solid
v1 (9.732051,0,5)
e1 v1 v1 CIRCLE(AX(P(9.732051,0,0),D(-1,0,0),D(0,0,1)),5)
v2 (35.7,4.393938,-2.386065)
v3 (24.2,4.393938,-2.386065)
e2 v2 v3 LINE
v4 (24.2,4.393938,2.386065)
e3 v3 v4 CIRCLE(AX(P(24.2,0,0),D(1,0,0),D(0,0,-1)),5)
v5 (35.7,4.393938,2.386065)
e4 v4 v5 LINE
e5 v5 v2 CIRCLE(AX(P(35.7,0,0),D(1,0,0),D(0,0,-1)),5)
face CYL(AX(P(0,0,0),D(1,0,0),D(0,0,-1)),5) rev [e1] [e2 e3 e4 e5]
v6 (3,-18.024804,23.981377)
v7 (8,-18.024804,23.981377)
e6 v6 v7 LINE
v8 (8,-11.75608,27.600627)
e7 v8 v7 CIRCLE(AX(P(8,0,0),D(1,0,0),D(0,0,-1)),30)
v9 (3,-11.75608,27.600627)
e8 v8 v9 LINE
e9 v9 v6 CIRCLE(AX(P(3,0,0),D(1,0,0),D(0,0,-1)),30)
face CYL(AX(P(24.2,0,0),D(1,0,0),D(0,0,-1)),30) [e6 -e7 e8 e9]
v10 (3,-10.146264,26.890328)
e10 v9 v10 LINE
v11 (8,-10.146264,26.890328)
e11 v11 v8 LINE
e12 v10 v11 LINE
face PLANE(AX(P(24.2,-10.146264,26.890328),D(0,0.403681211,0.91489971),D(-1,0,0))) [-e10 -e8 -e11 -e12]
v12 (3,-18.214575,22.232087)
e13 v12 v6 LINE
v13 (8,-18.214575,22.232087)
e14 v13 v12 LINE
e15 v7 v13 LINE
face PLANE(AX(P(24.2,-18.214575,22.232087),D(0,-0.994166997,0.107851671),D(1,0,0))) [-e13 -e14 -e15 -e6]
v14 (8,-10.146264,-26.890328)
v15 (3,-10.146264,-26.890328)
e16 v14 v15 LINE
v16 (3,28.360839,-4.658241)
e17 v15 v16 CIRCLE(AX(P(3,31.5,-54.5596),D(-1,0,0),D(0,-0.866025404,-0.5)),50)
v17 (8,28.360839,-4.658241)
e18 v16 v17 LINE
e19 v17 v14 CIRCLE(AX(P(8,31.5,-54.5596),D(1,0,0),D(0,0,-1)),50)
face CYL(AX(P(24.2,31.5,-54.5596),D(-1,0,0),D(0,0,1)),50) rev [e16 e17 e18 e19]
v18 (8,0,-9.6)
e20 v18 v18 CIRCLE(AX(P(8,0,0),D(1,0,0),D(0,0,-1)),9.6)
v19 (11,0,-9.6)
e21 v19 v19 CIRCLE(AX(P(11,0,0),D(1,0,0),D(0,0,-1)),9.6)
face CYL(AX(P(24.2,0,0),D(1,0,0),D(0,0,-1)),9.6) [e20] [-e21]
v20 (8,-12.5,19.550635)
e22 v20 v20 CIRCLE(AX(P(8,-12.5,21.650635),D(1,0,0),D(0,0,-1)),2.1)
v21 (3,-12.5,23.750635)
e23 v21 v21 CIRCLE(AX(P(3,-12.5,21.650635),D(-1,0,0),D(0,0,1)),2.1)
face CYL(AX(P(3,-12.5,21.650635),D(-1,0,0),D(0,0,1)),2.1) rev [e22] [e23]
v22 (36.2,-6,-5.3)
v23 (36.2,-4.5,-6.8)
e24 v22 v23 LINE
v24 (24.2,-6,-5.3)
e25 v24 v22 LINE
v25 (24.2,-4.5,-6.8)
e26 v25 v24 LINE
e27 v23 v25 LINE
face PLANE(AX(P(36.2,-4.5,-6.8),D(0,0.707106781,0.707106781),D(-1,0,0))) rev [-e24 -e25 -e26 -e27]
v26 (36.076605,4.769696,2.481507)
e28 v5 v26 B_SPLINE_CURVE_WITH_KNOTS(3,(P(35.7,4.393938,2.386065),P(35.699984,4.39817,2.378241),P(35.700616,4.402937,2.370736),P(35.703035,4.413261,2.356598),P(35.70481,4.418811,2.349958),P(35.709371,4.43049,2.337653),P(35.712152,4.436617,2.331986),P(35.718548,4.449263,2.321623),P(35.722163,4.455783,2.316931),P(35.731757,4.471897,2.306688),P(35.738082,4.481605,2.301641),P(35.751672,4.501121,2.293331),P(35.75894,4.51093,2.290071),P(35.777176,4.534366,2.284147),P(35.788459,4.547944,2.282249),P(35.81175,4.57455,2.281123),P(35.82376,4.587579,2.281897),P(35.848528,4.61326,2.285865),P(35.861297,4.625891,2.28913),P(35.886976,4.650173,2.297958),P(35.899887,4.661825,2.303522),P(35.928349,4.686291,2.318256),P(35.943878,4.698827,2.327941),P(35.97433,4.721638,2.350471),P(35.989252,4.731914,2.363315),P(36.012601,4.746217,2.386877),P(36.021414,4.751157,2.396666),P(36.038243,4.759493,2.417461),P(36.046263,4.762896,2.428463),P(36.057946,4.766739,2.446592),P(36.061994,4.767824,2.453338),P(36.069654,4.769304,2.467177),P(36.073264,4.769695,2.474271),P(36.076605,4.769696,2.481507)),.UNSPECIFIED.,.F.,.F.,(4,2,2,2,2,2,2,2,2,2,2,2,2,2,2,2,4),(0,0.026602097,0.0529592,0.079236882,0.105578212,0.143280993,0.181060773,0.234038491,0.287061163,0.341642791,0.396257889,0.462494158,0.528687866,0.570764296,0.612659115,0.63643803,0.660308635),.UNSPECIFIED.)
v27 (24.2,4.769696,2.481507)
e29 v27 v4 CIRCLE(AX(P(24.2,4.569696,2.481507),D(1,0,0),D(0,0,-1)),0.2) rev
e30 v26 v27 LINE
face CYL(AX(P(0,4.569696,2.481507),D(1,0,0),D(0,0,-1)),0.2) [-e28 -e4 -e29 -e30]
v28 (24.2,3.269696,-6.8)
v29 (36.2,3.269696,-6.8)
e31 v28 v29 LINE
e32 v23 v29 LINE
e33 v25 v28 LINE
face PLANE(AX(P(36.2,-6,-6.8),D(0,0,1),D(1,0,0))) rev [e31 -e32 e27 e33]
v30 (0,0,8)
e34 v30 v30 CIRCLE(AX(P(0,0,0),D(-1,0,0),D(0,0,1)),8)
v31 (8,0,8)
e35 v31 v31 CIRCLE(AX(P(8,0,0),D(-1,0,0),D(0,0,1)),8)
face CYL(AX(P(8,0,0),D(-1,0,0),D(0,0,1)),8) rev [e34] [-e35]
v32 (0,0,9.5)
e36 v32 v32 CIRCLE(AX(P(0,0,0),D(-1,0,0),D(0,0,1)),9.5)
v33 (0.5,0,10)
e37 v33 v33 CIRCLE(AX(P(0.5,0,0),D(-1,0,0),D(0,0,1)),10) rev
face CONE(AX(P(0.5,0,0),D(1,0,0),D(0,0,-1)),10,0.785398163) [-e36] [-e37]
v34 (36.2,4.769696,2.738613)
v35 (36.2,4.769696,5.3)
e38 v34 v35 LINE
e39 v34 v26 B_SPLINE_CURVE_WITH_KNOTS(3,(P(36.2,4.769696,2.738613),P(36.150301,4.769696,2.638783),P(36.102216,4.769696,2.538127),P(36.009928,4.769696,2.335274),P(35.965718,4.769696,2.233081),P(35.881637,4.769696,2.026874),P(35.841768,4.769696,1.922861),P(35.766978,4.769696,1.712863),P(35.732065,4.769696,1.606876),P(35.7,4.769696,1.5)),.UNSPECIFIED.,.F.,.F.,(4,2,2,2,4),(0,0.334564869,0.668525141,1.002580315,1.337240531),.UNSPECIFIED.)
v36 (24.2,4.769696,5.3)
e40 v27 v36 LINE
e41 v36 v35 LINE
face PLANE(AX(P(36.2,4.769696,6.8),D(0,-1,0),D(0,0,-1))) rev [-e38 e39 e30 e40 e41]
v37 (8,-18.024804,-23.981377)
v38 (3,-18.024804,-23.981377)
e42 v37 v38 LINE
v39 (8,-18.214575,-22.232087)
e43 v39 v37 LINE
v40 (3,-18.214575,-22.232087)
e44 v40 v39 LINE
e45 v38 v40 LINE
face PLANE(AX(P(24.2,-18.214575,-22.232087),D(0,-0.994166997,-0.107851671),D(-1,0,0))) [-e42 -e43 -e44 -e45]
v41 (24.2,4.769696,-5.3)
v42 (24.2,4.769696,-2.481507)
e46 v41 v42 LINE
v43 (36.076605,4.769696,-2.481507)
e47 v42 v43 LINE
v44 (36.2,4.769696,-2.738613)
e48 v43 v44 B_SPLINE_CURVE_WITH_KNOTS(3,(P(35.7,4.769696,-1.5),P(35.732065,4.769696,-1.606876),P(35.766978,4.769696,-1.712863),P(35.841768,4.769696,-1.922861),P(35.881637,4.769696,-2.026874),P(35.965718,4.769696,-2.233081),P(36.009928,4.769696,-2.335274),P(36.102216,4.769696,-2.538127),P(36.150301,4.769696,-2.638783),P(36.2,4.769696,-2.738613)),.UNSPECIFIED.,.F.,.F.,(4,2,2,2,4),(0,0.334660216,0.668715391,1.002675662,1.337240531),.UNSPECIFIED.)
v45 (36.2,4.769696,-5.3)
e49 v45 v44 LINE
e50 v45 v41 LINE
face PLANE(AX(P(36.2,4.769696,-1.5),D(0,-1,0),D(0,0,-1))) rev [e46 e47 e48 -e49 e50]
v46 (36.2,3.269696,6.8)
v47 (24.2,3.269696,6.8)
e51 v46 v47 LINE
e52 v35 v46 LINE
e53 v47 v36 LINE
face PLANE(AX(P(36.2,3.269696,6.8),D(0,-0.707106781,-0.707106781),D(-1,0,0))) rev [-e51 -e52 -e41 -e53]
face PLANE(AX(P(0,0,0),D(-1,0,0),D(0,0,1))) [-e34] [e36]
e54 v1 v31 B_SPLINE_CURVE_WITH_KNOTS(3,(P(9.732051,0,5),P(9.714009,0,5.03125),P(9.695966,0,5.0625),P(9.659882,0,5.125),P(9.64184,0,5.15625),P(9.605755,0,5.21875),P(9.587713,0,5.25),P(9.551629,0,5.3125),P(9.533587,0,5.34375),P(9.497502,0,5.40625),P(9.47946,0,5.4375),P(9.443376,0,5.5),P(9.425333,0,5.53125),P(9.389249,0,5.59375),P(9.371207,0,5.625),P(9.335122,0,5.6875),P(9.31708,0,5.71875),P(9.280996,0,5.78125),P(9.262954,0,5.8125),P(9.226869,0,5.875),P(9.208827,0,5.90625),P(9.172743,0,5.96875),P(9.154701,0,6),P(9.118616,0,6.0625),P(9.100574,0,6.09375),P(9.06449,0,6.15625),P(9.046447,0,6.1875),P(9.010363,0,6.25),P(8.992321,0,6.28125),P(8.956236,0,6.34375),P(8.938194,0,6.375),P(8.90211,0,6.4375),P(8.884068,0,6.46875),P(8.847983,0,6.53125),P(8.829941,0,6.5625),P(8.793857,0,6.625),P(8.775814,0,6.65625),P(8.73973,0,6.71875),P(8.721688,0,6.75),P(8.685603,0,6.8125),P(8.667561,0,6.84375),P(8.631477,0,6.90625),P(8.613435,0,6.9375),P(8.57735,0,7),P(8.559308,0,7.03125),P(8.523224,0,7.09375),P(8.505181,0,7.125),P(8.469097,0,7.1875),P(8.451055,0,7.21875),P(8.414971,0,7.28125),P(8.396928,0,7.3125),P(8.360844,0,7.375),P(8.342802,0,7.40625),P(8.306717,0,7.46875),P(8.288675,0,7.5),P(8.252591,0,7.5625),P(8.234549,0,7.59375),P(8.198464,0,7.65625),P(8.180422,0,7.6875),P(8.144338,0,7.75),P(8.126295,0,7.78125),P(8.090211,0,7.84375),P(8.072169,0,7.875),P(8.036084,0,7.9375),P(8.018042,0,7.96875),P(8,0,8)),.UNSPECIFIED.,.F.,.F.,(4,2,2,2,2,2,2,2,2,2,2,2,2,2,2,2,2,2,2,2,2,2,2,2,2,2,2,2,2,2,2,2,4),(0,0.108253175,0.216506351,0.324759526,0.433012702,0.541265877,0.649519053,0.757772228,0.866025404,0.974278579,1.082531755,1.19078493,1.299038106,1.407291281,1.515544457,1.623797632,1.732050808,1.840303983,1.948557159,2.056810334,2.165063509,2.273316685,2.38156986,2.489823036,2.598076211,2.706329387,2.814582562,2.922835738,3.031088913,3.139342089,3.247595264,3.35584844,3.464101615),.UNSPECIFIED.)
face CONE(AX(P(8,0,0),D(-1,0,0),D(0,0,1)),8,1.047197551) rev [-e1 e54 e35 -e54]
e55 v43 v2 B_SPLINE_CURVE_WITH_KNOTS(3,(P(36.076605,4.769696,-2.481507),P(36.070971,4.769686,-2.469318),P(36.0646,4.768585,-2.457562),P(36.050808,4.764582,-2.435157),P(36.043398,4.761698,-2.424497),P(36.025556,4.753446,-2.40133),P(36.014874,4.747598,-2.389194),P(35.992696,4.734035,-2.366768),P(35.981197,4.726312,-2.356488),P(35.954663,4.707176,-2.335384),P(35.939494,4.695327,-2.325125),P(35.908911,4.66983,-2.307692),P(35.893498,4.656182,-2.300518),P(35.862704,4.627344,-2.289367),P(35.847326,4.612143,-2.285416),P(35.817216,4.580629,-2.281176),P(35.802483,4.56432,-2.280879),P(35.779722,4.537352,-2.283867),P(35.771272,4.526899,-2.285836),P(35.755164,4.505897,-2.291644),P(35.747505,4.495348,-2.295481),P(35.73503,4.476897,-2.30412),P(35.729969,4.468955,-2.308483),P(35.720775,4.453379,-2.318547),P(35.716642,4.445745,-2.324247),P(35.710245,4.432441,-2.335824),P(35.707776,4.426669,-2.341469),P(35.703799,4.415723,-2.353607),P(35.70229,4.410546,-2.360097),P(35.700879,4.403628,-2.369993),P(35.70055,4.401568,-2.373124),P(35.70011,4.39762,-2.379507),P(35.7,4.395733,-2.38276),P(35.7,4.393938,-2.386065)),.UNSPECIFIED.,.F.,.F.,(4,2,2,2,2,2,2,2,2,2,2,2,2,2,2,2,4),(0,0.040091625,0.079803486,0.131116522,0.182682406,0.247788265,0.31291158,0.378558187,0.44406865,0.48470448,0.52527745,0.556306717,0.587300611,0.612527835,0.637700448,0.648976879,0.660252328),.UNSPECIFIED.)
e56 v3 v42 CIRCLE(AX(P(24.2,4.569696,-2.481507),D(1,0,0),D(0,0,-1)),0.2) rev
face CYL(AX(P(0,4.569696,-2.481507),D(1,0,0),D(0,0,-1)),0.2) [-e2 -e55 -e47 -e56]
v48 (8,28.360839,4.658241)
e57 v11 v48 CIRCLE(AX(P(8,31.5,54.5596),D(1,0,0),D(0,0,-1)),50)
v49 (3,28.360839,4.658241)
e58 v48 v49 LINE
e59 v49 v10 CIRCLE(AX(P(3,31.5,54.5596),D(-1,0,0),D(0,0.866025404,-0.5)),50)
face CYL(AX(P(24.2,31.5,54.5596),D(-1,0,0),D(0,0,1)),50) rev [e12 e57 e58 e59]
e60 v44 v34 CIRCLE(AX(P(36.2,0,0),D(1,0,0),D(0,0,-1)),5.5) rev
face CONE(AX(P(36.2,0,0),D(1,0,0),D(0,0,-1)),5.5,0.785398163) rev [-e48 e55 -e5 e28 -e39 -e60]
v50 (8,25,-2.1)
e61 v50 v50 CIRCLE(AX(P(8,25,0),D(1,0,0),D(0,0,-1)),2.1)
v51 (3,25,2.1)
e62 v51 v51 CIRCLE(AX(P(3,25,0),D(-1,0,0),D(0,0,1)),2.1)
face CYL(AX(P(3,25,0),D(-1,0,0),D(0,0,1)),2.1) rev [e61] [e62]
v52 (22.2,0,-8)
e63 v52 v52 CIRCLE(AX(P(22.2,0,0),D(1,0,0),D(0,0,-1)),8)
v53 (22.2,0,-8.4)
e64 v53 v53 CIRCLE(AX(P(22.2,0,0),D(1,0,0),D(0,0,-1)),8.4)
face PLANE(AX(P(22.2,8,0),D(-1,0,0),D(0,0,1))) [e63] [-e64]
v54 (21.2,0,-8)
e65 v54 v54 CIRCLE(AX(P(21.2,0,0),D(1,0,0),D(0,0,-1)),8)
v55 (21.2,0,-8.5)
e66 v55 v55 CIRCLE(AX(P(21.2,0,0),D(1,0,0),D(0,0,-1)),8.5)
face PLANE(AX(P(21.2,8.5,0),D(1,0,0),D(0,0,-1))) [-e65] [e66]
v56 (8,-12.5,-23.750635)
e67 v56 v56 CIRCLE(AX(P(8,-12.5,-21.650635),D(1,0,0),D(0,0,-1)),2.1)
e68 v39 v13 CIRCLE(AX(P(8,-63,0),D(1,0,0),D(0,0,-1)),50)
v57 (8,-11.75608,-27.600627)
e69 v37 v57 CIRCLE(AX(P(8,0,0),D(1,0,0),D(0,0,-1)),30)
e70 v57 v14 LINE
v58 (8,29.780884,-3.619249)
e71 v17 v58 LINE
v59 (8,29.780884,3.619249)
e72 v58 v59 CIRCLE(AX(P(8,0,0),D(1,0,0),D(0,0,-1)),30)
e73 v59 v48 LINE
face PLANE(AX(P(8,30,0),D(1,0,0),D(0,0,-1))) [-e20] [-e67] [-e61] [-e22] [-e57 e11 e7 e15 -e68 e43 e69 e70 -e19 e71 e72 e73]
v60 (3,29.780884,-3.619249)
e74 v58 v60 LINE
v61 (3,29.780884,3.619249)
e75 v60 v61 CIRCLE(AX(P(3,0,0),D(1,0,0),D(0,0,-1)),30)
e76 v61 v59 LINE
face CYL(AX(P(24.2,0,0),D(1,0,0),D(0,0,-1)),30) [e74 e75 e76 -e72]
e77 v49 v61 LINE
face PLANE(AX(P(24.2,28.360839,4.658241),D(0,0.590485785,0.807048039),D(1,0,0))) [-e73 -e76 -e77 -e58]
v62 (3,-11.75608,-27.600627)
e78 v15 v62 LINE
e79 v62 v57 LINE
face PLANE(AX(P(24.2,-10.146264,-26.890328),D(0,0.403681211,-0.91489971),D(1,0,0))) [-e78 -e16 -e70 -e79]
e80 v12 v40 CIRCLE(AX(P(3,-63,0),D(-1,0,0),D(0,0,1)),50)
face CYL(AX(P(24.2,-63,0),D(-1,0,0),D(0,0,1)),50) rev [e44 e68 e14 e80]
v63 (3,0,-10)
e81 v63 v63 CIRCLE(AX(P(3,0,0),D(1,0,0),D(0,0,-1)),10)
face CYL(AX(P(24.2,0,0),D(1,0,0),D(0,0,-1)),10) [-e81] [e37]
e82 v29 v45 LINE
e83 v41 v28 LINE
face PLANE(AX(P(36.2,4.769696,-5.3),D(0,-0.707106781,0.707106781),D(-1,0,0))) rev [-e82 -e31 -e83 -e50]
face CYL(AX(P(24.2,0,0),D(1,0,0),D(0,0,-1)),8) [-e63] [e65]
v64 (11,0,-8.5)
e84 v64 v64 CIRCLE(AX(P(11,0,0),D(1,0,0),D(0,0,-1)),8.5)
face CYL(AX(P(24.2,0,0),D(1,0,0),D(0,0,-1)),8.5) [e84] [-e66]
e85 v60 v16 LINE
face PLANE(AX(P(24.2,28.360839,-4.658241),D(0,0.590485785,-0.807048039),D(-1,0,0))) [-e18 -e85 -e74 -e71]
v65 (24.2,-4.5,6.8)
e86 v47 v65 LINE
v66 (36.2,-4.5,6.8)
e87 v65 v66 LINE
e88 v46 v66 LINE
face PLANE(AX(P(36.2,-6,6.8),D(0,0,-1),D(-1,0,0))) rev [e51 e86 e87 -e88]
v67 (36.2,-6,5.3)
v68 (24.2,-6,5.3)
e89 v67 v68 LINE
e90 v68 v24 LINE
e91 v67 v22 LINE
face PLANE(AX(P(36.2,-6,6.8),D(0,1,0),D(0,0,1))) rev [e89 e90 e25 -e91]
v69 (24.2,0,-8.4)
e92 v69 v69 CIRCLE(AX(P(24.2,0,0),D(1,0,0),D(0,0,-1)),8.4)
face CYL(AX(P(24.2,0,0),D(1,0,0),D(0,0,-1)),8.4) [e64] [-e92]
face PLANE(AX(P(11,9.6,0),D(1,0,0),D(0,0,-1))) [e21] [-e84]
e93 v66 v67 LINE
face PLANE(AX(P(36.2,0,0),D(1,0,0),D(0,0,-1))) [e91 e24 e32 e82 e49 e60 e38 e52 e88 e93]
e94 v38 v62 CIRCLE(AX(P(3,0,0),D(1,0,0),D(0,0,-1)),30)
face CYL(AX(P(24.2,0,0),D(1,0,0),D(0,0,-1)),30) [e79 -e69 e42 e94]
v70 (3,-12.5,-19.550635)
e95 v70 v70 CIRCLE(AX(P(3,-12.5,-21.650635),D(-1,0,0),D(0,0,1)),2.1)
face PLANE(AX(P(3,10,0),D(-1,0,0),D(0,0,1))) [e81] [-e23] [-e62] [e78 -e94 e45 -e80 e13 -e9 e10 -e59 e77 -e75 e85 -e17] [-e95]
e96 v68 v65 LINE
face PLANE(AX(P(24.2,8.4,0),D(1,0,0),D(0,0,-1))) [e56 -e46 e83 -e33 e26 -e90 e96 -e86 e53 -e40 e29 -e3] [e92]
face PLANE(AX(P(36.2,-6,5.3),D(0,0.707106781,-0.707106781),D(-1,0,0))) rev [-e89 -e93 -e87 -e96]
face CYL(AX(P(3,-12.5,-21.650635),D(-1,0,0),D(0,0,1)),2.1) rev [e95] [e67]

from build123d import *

# Parameters (mm, degrees)
SKETCH_2_R               = 5
CUT_EXTRUDE_1_DEPTH      = 49.84301383
CUT_EXTRUDE_START        = -8
SKETCH_3_R               = 8
CUT_EXTRUDE_2_DEPTH      = 8
CHAMFER_1_SIZE2          = 1.732050808
CHAMFER_1_SIZE           = 3
HOLE_WIZARD_M5_1_D       = 4.2
CUT_EXTRUDE_3_DEPTH      = 48.428261617
PATTERN_CIRCULAR_1_COUNT = 3
CHAMFER_4_SIZE           = 0.5
EXTRUDE_START            = 12
EXTRUDE_1_DEPTH          = 12
CHAMFER_5_SIZE           = 1.5
CHAMFER_6_SIZE           = 0.5
FILLET_1_R               = 0.2


# Some blends are built 0.0001 mm under size
with BuildPart() as part:
    # 草图1 → 旋转1 (revolve)
    with BuildSketch(Plane.XY, mode=Mode.PRIVATE) as revolve_1_sk:
        Polygon((0, 0), (0, 10), (3, 10), (3, 30), (8, 30), (8, 9.6), (11, 9.6), (11, 8.5), (21.2, 8.5), (21.2, 8), (22.2, 8), (22.2, 8.4), (24.2, 8.4), (24.2, 0), align=None)
    revolve(revolve_1_sk.sketch.rotate(Axis((24.2, 0, 0), (-1, 0, 0)), 90), axis=Axis((24.2, 0, 0), (-1, 0, 0)))

    # 草图2 → 切除-拉伸1 (cut, through all)
    with BuildSketch(Plane(origin=(24.2, 0, 0), x_dir=(0, 0, -1), z_dir=(1, 0, 0))):
        Circle(SKETCH_2_R)
    extrude(amount=-CUT_EXTRUDE_1_DEPTH, mode=Mode.SUBTRACT)

    # 草图3 → 切除-拉伸2 (cut)
    with BuildSketch(Plane.ZY.offset(CUT_EXTRUDE_START)):
        with Locations(Location((0, 0, 0), (0, 0, 180))):
            Circle(SKETCH_3_R)
    extrude(amount=CUT_EXTRUDE_2_DEPTH, mode=Mode.SUBTRACT)

    # 倒角1
    chamfer_1_edges = [part.edges().sort_by_distance(p)[0] for p in [
        (8, 0, 5),
    ]]
    chamfer_1_side = [part.faces().sort_by_distance(p)[0] for p in [
        (8, 0, 5.034641016),
    ]]
    chamfer(chamfer_1_edges, length=CHAMFER_1_SIZE - 0.0001, length2=CHAMFER_1_SIZE2 - 0.0001, reference=chamfer_1_side[0])  # a hair under: the kernel refuses the full size

    # M5 螺纹孔1 (through all)
    with Locations(Plane(origin=(3, 25, 0), x_dir=(0, 0, -1), z_dir=(-1, 0, 0))):
        with Locations((0, 0), (-21.650635095, 37.5), (21.650635095, 37.5)):
            Hole(HOLE_WIZARD_M5_1_D / 2)

    # 草图4 → 切除-拉伸3 (cut, through all)
    with BuildSketch(Plane.ZY.offset(-3)):
        with BuildLine():
            ThreePointArc((-27.710194429, -21.380952381), (0, -35), (27.710194429, -21.380952381))
            ThreePointArc((27.710194429, -21.380952381), (0, -13), (-27.710194429, -21.380952381))
        make_face()
    cut_extrude_3 = extrude(amount=-CUT_EXTRUDE_3_DEPTH, mode=Mode.SUBTRACT)

    # 阵列(圆周)1: 切除-拉伸3 ×3 about axis
    pattern_circular_1_axis = Axis((0, 0, 0), (1, 0, 0))
    for i in range(1, PATTERN_CIRCULAR_1_COUNT):
        add(cut_extrude_3.rotate(pattern_circular_1_axis, i * 360 / PATTERN_CIRCULAR_1_COUNT), mode=Mode.SUBTRACT)

    # 倒角2
    # the kernel refuses this chamfer: 1.262336382, 1 mm, written as the material it takes off along each edge
    with BuildSketch(Plane(origin=(-0.323534522, -18.801587302, -23.377346191), x_dir=(0, 0.7894182220381707, -0.6138557409637001), z_dir=(1, 0, 0)), Plane(origin=(-0.323534522, -10.844582024, 27.97132533), x_dir=(0, -0.9263237769525716, -0.3767283640135453), z_dir=(1, 0, 0)), Plane(origin=(-0.323534522, 29.646169325, -4.593979139), x_dir=(0, 0.13690555491440626, 0.9905841049772496), z_dir=(1, 0, 0))) as chamfer_2_piece_1:
        with BuildLine():
            Line((0.983994902, 0), (-0.239625676, 1.264429883))
            ThreePointArc((-0.239625676, 1.264429883), (-0.119678092, 0.653717986), (0, 0))
            ThreePointArc((0, 0), (0.509546154, -0.004029497), (0.983994902, 0))
        make_face()
    extrude(amount=11.647069044, mode=Mode.SUBTRACT)
    with BuildSketch(Plane(origin=(-0.323534522, -10.844582024, -27.97132533), x_dir=(0, 0.5426204152715339, 0.8399780264569711), z_dir=(1, 0, 0)), Plane(origin=(-0.323534522, 29.646169325, 4.593979139), x_dir=(0, -0.9987525171682211, 0.04993405100872917), z_dir=(1, 0, 0))) as chamfer_2_piece_2:
        with BuildLine():
            Line((1.28693566, 0), (-0.183218517, 0.966786917))
            ThreePointArc((-0.183218517, 0.966786917), (-0.098835833, 0.499884984), (0, 0))
            ThreePointArc((0, 0), (0.664569743, 0.004136227), (1.28693566, 0))
        make_face()
    extrude(amount=11.647069044, mode=Mode.SUBTRACT)
    with BuildSketch(Plane(origin=(-0.323534522, -18.801587302, 23.377346191), x_dir=(0, 0.7894182220381672, 0.6138557409637047), z_dir=(1, 0, 0))) as chamfer_2_piece_3:
        with BuildLine():
            Line((0.983994902, 0), (-0.239625676, -1.264429883))
            ThreePointArc((-0.239625676, -1.264429883), (-0.119678092, -0.653717986), (0, 0))
            ThreePointArc((0, 0), (0.509546154, 0.004029497), (0.983994902, 0))
        make_face()
    extrude(amount=11.647069044, mode=Mode.SUBTRACT)

    # 倒角4
    chamfer_4_edges = [part.edges().sort_by_distance(p)[0] for p in [
        (0, 0, 10),
    ]]
    chamfer(chamfer_4_edges, length=CHAMFER_4_SIZE)

    # 草图7 → 凸台-拉伸1 (add)
    with BuildSketch(Plane(origin=(24.2, 0, 0), x_dir=(0, 0, -1), z_dir=(1, 0, 0)).offset(EXTRUDE_START)):
        with BuildLine():
            Line((-6.8, -6), (6.8, -6))
            Line((6.8, -6), (6.8, 4.769696007))
            Line((6.8, 4.769696007), (1.5, 4.769696007))
            ThreePointArc((1.5, 4.769696007), (0, -5), (-1.5, 4.769696007))
            Line((-1.5, 4.769696007), (-6.8, 4.769696007))
            Line((-6.8, 4.769696007), (-6.8, -6))
        make_face()
    extrude(amount=-EXTRUDE_1_DEPTH)

    # 倒角5
    # the kernel refuses this chamfer: 1.5 mm, written as the material it takes off along each edge
    with BuildSketch(Plane(origin=(40.057524482, 4.769696007, 6.8), x_dir=(0, 0, -1), z_dir=(-1, 0, 0)), Plane(origin=(40.057524482, -6, 6.8), x_dir=(0, 1, 0), z_dir=(-1, 0, 0))) as chamfer_5_piece_1:
        Polygon((CHAMFER_5_SIZE, 0), (0, CHAMFER_5_SIZE), (0, 0), align=None)
    extrude(amount=15.857524482, mode=Mode.SUBTRACT)
    with BuildSketch(Plane(origin=(40.057524482, -6, -6.8), x_dir=(0, 1, 0), z_dir=(-1, 0, 0)), Plane(origin=(40.057524482, 4.769696007, -6.8), x_dir=(0, 0, 1), z_dir=(-1, 0, 0))) as chamfer_5_piece_2:
        Polygon((CHAMFER_5_SIZE, 0), (0, -CHAMFER_5_SIZE), (0, 0), align=None)
    extrude(amount=15.857524482, mode=Mode.SUBTRACT)

    # 倒角6
    chamfer_6_edges = [part.edges().sort_by_distance(p)[0] for p in [
        (36.2, -5, 0),
    ]]
    chamfer(chamfer_6_edges, length=CHAMFER_6_SIZE)

    # 圆角1
    # the kernel refuses this fillet: 0.2 mm, written as the material it takes off along each edge
    with BuildSketch(Plane(origin=(38.153768211, 4.769696007, 1.5), x_dir=(0, -0.3904189103265273, 0.9206373197190341), z_dir=(-1, 0, 0))) as fillet_1_piece_1:
        with BuildLine():
            CenterArc((0.981696018, 0.199071541), FILLET_1_R, 112.980567733, 151.496467657)
            Line((0.903612236, 0.383199004), (0, 0))
            ThreePointArc((0, 0), (0.481223538, 0.023211487), (0.962447076, 0))
        make_face()
    extrude(amount=13.953768211, mode=Mode.SUBTRACT)
    with BuildSketch(Plane(origin=(38.153768211, 4.769696007, -1.5), x_dir=(0, -0.39041891032652715, -0.9206373197190343), z_dir=(-1, 0, 0))) as fillet_1_piece_2:
        with BuildLine():
            CenterArc((0.981696018, -0.199071541), FILLET_1_R, 95.52296461, 151.496467657)
            Line((0.903612236, -0.383199004), (0, 0))
            ThreePointArc((0, 0), (0.481223538, -0.023211487), (0.962447076, 0))
        make_face()
    extrude(amount=13.953768211, mode=Mode.SUBTRACT)


solid = part.part
